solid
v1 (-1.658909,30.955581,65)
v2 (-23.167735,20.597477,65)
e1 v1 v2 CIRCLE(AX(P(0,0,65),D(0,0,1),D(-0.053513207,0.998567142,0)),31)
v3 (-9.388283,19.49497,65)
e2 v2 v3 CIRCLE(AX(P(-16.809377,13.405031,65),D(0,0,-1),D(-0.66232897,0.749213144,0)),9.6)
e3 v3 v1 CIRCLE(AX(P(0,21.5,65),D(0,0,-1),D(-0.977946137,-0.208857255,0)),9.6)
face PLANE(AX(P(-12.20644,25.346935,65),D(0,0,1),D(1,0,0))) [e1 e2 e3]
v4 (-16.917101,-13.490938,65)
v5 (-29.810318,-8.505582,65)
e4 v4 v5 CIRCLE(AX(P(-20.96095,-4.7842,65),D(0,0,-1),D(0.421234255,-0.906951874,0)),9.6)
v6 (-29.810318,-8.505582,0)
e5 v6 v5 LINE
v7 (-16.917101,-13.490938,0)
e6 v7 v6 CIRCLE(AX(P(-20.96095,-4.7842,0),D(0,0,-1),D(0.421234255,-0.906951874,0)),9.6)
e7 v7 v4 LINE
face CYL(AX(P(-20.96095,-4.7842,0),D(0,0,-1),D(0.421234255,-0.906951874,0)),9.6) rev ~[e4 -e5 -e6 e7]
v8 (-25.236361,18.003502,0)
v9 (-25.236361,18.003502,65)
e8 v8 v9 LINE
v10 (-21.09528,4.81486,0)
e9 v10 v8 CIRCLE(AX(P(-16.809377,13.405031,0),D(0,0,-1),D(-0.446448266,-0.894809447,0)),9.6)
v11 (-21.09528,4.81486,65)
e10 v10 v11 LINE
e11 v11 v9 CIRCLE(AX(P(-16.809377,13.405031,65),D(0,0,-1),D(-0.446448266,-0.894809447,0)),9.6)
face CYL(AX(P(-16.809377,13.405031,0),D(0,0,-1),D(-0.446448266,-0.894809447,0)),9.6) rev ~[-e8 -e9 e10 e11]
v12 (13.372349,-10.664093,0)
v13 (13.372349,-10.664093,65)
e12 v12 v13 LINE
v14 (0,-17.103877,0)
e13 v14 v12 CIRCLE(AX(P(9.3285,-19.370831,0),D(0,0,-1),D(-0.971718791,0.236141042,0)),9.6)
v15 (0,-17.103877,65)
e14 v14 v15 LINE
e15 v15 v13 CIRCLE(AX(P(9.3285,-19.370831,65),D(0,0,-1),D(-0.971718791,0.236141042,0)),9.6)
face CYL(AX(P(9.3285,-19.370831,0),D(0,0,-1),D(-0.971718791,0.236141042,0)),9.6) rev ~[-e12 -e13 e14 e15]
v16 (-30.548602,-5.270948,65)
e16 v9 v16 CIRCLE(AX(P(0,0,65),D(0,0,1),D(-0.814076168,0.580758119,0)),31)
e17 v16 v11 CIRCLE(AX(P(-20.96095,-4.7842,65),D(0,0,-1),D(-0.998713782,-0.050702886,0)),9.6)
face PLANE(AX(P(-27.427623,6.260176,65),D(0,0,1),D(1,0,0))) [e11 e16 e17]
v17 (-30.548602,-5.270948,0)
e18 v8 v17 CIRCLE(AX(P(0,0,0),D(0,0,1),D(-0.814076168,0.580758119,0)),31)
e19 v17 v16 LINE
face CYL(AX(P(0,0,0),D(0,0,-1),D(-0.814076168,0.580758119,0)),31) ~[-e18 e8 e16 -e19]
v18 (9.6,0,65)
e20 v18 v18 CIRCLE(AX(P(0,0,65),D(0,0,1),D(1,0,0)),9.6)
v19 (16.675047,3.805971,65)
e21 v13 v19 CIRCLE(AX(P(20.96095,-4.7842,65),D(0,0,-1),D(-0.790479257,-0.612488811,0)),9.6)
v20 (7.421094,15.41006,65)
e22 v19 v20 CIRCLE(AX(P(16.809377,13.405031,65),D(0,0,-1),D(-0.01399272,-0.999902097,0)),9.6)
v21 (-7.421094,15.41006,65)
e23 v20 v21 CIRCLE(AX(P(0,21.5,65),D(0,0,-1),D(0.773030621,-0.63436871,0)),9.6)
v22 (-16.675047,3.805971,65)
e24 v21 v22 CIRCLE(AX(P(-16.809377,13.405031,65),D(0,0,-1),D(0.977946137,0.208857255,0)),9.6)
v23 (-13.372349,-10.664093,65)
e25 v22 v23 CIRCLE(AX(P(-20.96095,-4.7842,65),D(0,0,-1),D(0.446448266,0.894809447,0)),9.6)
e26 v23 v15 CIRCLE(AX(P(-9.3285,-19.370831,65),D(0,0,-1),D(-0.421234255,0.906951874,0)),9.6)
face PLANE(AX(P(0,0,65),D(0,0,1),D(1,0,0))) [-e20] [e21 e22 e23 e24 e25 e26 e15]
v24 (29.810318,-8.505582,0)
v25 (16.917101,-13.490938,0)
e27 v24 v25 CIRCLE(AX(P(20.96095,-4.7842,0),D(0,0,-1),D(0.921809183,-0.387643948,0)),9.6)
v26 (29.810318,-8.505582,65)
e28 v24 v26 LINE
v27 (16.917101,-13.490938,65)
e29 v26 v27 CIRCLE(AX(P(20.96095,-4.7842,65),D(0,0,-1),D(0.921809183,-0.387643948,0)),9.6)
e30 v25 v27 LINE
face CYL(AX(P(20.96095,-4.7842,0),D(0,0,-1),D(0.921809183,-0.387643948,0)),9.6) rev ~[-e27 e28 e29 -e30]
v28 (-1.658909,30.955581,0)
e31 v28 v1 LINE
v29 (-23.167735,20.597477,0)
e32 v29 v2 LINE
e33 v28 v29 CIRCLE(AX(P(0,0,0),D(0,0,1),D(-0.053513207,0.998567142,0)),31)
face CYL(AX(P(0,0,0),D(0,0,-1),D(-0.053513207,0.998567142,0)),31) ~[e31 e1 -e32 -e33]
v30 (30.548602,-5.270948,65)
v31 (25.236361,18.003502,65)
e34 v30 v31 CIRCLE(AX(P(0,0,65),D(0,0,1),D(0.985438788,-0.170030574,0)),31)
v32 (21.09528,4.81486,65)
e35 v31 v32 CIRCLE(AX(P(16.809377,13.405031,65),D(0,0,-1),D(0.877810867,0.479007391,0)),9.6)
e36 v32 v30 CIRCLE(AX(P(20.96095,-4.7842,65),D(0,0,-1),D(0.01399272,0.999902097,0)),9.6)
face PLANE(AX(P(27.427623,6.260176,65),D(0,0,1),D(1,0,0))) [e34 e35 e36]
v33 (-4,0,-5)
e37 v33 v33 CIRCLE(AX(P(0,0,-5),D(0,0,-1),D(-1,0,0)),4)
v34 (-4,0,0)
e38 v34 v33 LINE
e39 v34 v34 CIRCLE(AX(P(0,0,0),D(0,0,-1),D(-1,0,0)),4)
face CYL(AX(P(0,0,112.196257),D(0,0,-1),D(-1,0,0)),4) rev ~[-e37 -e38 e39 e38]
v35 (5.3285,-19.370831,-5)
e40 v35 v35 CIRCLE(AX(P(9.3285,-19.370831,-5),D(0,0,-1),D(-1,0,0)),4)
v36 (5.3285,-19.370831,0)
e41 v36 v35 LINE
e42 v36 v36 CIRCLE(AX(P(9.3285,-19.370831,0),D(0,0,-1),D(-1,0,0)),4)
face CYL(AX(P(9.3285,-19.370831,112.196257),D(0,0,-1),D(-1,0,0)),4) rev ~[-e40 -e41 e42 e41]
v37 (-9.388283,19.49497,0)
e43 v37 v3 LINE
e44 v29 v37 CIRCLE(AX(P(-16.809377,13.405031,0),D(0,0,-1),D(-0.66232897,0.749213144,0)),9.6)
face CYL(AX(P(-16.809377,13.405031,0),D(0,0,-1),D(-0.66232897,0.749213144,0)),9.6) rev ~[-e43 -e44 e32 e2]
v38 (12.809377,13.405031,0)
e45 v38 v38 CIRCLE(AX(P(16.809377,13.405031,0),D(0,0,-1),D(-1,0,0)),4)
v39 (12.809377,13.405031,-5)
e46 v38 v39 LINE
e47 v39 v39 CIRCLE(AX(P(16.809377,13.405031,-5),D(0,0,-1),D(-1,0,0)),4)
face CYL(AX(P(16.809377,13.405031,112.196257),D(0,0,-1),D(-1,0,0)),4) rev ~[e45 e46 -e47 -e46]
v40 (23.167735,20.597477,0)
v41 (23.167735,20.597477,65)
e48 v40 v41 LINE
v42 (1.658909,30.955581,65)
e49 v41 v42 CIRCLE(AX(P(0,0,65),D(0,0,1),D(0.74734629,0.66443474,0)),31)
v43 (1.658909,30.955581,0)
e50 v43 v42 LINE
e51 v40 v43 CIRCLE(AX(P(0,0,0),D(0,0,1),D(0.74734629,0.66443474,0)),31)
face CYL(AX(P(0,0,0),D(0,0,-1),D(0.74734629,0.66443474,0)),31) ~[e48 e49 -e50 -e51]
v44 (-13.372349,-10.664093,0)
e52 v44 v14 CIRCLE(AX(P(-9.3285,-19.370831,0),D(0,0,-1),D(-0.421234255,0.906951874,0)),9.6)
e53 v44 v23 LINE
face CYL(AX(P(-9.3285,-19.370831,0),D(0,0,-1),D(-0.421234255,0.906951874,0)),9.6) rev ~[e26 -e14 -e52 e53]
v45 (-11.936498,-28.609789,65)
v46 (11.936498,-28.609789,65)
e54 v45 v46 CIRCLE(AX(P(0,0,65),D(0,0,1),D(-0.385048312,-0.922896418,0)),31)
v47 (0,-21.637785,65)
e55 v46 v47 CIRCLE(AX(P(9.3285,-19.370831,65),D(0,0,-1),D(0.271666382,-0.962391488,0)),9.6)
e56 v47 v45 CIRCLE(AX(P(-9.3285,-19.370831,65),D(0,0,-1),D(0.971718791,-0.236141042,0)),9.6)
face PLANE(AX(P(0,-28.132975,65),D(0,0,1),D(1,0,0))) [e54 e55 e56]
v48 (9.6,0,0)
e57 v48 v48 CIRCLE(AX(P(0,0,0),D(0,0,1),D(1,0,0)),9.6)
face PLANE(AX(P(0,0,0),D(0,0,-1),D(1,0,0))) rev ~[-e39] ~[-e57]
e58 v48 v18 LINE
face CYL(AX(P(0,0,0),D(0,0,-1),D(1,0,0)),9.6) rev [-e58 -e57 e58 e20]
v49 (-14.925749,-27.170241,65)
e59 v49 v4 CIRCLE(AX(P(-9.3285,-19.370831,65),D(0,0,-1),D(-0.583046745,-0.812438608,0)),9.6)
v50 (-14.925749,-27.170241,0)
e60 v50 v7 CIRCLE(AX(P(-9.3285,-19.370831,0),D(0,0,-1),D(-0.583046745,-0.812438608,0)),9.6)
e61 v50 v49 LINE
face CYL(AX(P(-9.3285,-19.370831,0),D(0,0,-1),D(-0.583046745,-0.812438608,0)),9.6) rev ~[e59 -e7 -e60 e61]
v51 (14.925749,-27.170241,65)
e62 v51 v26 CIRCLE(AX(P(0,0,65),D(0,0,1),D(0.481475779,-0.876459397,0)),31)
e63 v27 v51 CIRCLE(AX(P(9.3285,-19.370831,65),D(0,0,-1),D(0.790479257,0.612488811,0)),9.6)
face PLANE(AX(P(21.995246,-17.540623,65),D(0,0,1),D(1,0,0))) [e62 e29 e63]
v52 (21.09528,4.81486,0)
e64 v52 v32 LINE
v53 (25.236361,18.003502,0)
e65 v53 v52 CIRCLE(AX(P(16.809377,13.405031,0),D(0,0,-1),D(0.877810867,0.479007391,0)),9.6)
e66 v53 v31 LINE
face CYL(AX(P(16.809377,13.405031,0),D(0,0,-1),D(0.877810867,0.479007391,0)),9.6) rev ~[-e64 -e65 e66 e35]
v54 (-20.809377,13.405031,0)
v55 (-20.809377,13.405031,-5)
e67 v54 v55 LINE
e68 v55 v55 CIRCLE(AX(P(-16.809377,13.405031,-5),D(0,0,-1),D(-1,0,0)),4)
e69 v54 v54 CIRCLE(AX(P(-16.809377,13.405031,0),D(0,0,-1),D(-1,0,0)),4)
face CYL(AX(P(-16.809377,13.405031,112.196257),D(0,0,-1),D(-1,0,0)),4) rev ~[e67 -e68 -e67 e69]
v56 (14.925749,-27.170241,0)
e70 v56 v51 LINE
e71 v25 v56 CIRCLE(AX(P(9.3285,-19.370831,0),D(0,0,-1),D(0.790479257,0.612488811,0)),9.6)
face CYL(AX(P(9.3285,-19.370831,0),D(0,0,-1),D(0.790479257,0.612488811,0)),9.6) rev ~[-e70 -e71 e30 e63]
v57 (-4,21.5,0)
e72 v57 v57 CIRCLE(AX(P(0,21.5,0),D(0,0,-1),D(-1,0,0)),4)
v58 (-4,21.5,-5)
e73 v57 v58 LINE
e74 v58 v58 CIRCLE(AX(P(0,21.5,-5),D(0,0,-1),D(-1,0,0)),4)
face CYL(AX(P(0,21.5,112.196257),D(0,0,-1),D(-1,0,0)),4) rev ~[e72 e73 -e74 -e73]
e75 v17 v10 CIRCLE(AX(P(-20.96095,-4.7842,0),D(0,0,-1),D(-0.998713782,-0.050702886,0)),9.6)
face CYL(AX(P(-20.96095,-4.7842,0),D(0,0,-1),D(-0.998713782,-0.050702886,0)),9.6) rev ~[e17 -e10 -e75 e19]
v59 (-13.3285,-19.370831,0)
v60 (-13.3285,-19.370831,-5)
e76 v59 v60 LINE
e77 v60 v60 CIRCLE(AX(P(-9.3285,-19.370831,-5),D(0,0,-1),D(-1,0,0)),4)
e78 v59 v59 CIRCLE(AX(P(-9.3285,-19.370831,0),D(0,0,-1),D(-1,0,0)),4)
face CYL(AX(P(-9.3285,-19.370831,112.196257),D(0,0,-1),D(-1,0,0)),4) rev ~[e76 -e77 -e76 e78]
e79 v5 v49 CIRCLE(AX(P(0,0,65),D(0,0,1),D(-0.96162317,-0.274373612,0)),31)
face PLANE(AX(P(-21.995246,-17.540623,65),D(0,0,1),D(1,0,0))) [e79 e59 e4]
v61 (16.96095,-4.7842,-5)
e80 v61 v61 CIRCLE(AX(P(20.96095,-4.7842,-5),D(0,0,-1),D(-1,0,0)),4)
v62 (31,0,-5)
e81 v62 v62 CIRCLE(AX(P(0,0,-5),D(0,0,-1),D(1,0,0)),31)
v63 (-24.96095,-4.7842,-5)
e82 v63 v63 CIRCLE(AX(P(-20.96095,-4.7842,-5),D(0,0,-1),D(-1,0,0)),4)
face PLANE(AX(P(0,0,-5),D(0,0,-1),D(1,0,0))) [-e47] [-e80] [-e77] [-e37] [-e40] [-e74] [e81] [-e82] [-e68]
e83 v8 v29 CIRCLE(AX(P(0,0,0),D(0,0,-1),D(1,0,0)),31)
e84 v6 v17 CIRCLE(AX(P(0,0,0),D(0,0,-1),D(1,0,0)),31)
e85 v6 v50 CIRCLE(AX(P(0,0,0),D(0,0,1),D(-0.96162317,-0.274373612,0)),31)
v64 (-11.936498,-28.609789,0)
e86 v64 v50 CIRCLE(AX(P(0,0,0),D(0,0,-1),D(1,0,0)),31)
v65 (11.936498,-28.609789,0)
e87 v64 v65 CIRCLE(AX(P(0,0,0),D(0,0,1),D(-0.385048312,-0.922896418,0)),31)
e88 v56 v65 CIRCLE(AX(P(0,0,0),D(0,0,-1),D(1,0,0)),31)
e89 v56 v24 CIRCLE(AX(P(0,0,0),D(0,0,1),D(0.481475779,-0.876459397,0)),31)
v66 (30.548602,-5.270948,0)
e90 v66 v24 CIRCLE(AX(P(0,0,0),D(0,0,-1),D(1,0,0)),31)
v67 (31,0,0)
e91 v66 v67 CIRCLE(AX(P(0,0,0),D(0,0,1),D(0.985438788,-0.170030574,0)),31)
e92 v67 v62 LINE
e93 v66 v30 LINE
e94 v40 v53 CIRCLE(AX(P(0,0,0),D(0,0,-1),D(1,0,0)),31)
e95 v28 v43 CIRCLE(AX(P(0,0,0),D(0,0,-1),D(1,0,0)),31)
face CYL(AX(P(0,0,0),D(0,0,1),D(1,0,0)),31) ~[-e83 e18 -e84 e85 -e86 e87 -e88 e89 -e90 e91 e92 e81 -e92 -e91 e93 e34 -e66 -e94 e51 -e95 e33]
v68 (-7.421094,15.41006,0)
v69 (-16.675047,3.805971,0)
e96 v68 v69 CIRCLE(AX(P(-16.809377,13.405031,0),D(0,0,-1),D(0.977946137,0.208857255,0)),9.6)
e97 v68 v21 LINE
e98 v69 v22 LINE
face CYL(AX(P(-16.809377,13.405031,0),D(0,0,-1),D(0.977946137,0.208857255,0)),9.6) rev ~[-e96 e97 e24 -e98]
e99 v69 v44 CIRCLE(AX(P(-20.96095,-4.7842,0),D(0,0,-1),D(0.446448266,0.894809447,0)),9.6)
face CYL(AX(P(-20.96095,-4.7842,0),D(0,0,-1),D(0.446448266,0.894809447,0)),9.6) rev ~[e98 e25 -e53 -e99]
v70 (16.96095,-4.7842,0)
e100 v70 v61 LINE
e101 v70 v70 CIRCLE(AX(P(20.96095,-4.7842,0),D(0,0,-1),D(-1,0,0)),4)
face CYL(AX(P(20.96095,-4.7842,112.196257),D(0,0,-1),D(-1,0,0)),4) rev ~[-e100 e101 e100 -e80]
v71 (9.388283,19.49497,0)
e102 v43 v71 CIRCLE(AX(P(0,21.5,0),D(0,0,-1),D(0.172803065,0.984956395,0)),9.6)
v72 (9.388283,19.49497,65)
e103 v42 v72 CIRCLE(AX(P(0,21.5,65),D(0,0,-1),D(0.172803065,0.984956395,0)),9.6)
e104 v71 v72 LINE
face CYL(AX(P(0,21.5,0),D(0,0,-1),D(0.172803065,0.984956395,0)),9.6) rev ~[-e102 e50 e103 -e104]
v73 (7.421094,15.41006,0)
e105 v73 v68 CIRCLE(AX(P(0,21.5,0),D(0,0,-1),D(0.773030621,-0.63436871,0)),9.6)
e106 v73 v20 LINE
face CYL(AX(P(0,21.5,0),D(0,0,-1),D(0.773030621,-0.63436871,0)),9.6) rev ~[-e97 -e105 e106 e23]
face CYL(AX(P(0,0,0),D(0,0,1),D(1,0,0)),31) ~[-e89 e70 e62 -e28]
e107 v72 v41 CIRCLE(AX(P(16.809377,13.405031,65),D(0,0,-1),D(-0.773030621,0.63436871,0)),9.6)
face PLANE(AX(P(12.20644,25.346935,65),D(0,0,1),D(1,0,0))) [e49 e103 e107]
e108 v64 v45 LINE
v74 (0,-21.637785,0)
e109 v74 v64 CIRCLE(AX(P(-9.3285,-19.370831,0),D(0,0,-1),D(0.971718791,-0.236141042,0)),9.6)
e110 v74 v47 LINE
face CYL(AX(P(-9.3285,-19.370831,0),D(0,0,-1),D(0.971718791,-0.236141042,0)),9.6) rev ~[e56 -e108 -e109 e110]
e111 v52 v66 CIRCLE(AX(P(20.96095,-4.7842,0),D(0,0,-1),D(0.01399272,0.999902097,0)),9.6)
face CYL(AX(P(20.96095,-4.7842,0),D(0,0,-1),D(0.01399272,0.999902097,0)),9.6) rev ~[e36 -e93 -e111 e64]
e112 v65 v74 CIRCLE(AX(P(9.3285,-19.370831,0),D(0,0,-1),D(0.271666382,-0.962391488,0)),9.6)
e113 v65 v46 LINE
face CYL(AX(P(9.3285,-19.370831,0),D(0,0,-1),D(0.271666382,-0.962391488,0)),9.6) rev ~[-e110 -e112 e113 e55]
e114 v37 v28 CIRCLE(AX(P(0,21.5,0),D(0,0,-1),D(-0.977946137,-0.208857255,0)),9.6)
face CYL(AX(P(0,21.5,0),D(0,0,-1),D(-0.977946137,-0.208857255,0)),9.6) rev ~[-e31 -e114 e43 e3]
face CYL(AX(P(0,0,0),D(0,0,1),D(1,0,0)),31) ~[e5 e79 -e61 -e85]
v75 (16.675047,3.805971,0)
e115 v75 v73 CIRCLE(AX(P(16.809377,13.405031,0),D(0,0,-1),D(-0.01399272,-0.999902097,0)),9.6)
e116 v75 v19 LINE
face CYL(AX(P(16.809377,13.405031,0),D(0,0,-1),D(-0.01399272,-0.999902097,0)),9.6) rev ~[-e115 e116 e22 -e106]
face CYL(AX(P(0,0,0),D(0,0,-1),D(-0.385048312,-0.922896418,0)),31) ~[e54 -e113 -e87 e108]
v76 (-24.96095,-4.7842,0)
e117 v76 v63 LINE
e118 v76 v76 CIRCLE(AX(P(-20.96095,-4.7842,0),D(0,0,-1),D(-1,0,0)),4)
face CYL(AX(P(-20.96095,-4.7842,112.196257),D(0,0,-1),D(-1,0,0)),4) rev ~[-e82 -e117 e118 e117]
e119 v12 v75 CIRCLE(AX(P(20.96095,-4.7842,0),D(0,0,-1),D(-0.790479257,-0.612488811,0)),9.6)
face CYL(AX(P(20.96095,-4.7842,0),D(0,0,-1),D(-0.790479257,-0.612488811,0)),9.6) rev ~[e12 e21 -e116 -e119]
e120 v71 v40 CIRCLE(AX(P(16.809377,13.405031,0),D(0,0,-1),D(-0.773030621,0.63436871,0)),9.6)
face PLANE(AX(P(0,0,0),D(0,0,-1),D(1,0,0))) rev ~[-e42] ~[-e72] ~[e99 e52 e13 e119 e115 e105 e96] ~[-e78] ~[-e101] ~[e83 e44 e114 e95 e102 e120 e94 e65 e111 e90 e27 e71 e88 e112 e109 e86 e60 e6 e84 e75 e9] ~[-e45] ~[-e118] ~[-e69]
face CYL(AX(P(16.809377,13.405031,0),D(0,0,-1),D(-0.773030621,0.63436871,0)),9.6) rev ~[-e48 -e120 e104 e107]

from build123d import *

# Parameters (mm, degrees)
F1_DEPTH = 65
F0_R     = 9.6
F2_R     = 31
F2_R_2   = 9.6
F3_DEPTH = 5
F5_D     = 8


with BuildPart() as f1:
    # F0 (on Top) → F1 (new body)
    with BuildSketch(Plane.XY):
        with BuildLine():
            ThreePointArc((0, -21.6377846635), (-4.4866514155, -27.6603721731), (-11.936497657, -28.6097889486))
            ThreePointArc((-11.936497657, -28.6097889486), (0, -31), (11.936497657, -28.6097889486))
            ThreePointArc((11.936497657, -28.6097889486), (4.4866514155, -27.6603721731), (0, -21.6377846635))
        make_face()
    extrude(amount=F1_DEPTH)



with BuildPart() as f1b:
    # F0 (on Top) → F1, piece 2 (new body)
    with BuildSketch(Plane.XY):
        with BuildLine():
            ThreePointArc((7.421093957, 15.4100603877), (0, 11.9), (-7.421093957, 15.4100603877))
            ThreePointArc((-7.421093957, 15.4100603877), (-9.3037946414, 7.4195286421), (-16.6750467587, 3.8059706078))
            ThreePointArc((-16.6750467587, 3.8059706078), (-11.601642155, -2.6479991141), (-13.3723492421, -10.6640926674))
            ThreePointArc((-13.3723492421, -10.6640926674), (-5.1632164955, -10.721529528), (0, -17.1038766563))
            ThreePointArc((0, -17.1038766563), (5.1632164955, -10.721529528), (13.3723492421, -10.6640926674))
            ThreePointArc((13.3723492421, -10.6640926674), (11.601642155, -2.6479991141), (16.6750467587, 3.8059706078))
            ThreePointArc((16.6750467587, 3.8059706078), (9.3037946414, 7.4195286421), (7.421093957, 15.4100603877))
        make_face()
        Circle(F0_R, mode=Mode.SUBTRACT)
    extrude(amount=F1_DEPTH)


with BuildPart() as f1c:
    # F0 (on Top) → F1, piece 3 (new body)
    with BuildSketch(Plane.XY):
        with BuildLine():
            ThreePointArc((-23.1677349851, 20.5974769246), (-16.0437189504, 22.9744491102), (-9.388282916, 19.4949703522))
            ThreePointArc((-9.388282916, 19.4949703522), (-7.9590524573, 26.8678192948), (-1.6589094237, 30.9555813953))
            ThreePointArc((-1.6589094237, 30.9555813953), (-13.4503959126, 27.930034905), (-23.1677349851, 20.5974769246))
        make_face()
    extrude(amount=F1_DEPTH)


with BuildPart() as f1d:
    # F0 (on Top) → F1, piece 4 (new body)
    with BuildSketch(Plane.XY):
        with BuildLine():
            ThreePointArc((-30.5486024144, -5.2709477823), (-27.9652427562, 1.7808501523), (-21.0952802263, 4.8148600521))
            ThreePointArc((-21.0952802263, 4.8148600521), (-25.9684950295, 10.5291735468), (-25.2363612008, 18.0035016966))
            ThreePointArc((-25.2363612008, 18.0035016966), (-30.2227652776, 6.8981489526), (-30.5486024144, -5.2709477823))
        make_face()
    extrude(amount=F1_DEPTH)


with BuildPart() as f1e:
    # F0 (on Top) → F1, piece 5 (new body)
    with BuildSketch(Plane.XY):
        with BuildLine():
            ThreePointArc((-14.9257491478, -27.1702413014), (-18.8283683796, -20.7537652931), (-16.9171012608, -13.4909380725))
            ThreePointArc((-16.9171012608, -13.4909380725), (-24.4231311838, -13.738154638), (-29.8103182658, -8.5055819842))
            ThreePointArc((-29.8103182658, -8.5055819842), (-24.2367759565, -19.3281838576), (-14.9257491478, -27.1702413014))
        make_face()
    extrude(amount=F1_DEPTH)


with BuildPart() as f1f:
    # F0 (on Top) → F1, piece 6 (new body)
    with BuildSketch(Plane.XY):
        with BuildLine():
            ThreePointArc((29.8103182658, -8.5055819842), (24.4231311838, -13.738154638), (16.9171012608, -13.4909380725))
            ThreePointArc((16.9171012608, -13.4909380725), (18.8283683796, -20.7537652931), (14.9257491478, -27.1702413014))
            ThreePointArc((14.9257491478, -27.1702413014), (24.2367759565, -19.3281838576), (29.8103182658, -8.5055819842))
        make_face()
    extrude(amount=F1_DEPTH)


with BuildPart() as f1g:
    # F0 (on Top) → F1, piece 7 (new body)
    with BuildSketch(Plane.XY):
        with BuildLine():
            ThreePointArc((25.2363612008, 18.0035016966), (25.9684950295, 10.5291735468), (21.0952802263, 4.8148600521))
            ThreePointArc((21.0952802263, 4.8148600521), (27.9652427562, 1.7808501523), (30.5486024144, -5.2709477823))
            ThreePointArc((30.5486024144, -5.2709477823), (30.2227652776, 6.8981489526), (25.2363612008, 18.0035016966))
        make_face()
    extrude(amount=F1_DEPTH)


with BuildPart() as f1h:
    # F0 (on Top) → F1, piece 8 (new body)
    with BuildSketch(Plane.XY):
        with BuildLine():
            ThreePointArc((1.6589094237, 30.9555813953), (7.9590524573, 26.8678192948), (9.388282916, 19.4949703522))
            ThreePointArc((9.388282916, 19.4949703522), (16.0437189504, 22.9744491102), (23.1677349851, 20.5974769246))
            ThreePointArc((23.1677349851, 20.5974769246), (13.4503959126, 27.930034905), (1.6589094237, 30.9555813953))
        make_face()
    extrude(amount=F1_DEPTH)


with BuildPart() as f1_1:
    add(f1.part)

    add(f1b.part)  # F3 merges F1b

    add(f1c.part)  # F3 merges F1c

    add(f1d.part)  # F3 merges F1d

    add(f1e.part)  # F3 merges F1e

    add(f1f.part)  # F3 merges F1f

    add(f1g.part)  # F3 merges F1g

    add(f1h.part)  # F3 merges F1h
    # F2 (on face) → F3 (join)
    with BuildSketch(Plane(origin=(0, 0, 0), x_dir=(1, 0, 0), z_dir=(0, 0, -1))):
        Circle(F2_R)
        with BuildLine():
            ThreePointArc((-13.3723492421, 10.6640926674), (-5.1632164955, 10.721529528), (0, 17.1038766563))
            ThreePointArc((0, 17.1038766563), (5.1632164955, 10.721529528), (13.3723492421, 10.6640926674))
            ThreePointArc((13.3723492421, 10.6640926674), (11.601642155, 2.6479991141), (16.6750467587, -3.8059706078))
            ThreePointArc((16.6750467587, -3.8059706078), (9.3037946414, -7.4195286421), (7.421093957, -15.4100603877))
            ThreePointArc((7.421093957, -15.4100603877), (0, -11.9), (-7.421093957, -15.4100603877))
            ThreePointArc((-7.421093957, -15.4100603877), (-9.3037946414, -7.4195286421), (-16.6750467587, -3.8059706078))
            ThreePointArc((-16.6750467587, -3.8059706078), (-11.601642155, 2.6479991141), (-13.3723492421, 10.6640926674))
        make_face(mode=Mode.SUBTRACT)
        with BuildLine():
            ThreePointArc((13.3723492421, 10.6640926674), (5.1632164955, 10.721529528), (0, 17.1038766563))
            ThreePointArc((0, 17.1038766563), (-5.1632164955, 10.721529528), (-13.3723492421, 10.6640926674))
            ThreePointArc((-13.3723492421, 10.6640926674), (-11.601642155, 2.6479991141), (-16.6750467587, -3.8059706078))
            ThreePointArc((-16.6750467587, -3.8059706078), (-9.3037946414, -7.4195286421), (-7.421093957, -15.4100603877))
            ThreePointArc((-7.421093957, -15.4100603877), (0, -11.9), (7.421093957, -15.4100603877))
            ThreePointArc((7.421093957, -15.4100603877), (9.3037946414, -7.4195286421), (16.6750467587, -3.8059706078))
            ThreePointArc((16.6750467587, -3.8059706078), (11.601642155, 2.6479991141), (13.3723492421, 10.6640926674))
        make_face()
        Circle(F2_R_2, mode=Mode.SUBTRACT)
        Circle(F2_R_2)
    extrude(amount=F3_DEPTH)

    # F5 (through all)
    with Locations(Plane.XY):
        with Locations((9.328500391, -19.3708306599), (20.9609501119, -4.7842000801), (16.8093768731, 13.40503074), (0, 21.5), (0, 0), (-16.8093768731, 13.40503074), (-20.9609501119, -4.7842000801), (-9.328500391, -19.3708306599)):
            Hole(F5_D / 2)


solid = f1_1.part
